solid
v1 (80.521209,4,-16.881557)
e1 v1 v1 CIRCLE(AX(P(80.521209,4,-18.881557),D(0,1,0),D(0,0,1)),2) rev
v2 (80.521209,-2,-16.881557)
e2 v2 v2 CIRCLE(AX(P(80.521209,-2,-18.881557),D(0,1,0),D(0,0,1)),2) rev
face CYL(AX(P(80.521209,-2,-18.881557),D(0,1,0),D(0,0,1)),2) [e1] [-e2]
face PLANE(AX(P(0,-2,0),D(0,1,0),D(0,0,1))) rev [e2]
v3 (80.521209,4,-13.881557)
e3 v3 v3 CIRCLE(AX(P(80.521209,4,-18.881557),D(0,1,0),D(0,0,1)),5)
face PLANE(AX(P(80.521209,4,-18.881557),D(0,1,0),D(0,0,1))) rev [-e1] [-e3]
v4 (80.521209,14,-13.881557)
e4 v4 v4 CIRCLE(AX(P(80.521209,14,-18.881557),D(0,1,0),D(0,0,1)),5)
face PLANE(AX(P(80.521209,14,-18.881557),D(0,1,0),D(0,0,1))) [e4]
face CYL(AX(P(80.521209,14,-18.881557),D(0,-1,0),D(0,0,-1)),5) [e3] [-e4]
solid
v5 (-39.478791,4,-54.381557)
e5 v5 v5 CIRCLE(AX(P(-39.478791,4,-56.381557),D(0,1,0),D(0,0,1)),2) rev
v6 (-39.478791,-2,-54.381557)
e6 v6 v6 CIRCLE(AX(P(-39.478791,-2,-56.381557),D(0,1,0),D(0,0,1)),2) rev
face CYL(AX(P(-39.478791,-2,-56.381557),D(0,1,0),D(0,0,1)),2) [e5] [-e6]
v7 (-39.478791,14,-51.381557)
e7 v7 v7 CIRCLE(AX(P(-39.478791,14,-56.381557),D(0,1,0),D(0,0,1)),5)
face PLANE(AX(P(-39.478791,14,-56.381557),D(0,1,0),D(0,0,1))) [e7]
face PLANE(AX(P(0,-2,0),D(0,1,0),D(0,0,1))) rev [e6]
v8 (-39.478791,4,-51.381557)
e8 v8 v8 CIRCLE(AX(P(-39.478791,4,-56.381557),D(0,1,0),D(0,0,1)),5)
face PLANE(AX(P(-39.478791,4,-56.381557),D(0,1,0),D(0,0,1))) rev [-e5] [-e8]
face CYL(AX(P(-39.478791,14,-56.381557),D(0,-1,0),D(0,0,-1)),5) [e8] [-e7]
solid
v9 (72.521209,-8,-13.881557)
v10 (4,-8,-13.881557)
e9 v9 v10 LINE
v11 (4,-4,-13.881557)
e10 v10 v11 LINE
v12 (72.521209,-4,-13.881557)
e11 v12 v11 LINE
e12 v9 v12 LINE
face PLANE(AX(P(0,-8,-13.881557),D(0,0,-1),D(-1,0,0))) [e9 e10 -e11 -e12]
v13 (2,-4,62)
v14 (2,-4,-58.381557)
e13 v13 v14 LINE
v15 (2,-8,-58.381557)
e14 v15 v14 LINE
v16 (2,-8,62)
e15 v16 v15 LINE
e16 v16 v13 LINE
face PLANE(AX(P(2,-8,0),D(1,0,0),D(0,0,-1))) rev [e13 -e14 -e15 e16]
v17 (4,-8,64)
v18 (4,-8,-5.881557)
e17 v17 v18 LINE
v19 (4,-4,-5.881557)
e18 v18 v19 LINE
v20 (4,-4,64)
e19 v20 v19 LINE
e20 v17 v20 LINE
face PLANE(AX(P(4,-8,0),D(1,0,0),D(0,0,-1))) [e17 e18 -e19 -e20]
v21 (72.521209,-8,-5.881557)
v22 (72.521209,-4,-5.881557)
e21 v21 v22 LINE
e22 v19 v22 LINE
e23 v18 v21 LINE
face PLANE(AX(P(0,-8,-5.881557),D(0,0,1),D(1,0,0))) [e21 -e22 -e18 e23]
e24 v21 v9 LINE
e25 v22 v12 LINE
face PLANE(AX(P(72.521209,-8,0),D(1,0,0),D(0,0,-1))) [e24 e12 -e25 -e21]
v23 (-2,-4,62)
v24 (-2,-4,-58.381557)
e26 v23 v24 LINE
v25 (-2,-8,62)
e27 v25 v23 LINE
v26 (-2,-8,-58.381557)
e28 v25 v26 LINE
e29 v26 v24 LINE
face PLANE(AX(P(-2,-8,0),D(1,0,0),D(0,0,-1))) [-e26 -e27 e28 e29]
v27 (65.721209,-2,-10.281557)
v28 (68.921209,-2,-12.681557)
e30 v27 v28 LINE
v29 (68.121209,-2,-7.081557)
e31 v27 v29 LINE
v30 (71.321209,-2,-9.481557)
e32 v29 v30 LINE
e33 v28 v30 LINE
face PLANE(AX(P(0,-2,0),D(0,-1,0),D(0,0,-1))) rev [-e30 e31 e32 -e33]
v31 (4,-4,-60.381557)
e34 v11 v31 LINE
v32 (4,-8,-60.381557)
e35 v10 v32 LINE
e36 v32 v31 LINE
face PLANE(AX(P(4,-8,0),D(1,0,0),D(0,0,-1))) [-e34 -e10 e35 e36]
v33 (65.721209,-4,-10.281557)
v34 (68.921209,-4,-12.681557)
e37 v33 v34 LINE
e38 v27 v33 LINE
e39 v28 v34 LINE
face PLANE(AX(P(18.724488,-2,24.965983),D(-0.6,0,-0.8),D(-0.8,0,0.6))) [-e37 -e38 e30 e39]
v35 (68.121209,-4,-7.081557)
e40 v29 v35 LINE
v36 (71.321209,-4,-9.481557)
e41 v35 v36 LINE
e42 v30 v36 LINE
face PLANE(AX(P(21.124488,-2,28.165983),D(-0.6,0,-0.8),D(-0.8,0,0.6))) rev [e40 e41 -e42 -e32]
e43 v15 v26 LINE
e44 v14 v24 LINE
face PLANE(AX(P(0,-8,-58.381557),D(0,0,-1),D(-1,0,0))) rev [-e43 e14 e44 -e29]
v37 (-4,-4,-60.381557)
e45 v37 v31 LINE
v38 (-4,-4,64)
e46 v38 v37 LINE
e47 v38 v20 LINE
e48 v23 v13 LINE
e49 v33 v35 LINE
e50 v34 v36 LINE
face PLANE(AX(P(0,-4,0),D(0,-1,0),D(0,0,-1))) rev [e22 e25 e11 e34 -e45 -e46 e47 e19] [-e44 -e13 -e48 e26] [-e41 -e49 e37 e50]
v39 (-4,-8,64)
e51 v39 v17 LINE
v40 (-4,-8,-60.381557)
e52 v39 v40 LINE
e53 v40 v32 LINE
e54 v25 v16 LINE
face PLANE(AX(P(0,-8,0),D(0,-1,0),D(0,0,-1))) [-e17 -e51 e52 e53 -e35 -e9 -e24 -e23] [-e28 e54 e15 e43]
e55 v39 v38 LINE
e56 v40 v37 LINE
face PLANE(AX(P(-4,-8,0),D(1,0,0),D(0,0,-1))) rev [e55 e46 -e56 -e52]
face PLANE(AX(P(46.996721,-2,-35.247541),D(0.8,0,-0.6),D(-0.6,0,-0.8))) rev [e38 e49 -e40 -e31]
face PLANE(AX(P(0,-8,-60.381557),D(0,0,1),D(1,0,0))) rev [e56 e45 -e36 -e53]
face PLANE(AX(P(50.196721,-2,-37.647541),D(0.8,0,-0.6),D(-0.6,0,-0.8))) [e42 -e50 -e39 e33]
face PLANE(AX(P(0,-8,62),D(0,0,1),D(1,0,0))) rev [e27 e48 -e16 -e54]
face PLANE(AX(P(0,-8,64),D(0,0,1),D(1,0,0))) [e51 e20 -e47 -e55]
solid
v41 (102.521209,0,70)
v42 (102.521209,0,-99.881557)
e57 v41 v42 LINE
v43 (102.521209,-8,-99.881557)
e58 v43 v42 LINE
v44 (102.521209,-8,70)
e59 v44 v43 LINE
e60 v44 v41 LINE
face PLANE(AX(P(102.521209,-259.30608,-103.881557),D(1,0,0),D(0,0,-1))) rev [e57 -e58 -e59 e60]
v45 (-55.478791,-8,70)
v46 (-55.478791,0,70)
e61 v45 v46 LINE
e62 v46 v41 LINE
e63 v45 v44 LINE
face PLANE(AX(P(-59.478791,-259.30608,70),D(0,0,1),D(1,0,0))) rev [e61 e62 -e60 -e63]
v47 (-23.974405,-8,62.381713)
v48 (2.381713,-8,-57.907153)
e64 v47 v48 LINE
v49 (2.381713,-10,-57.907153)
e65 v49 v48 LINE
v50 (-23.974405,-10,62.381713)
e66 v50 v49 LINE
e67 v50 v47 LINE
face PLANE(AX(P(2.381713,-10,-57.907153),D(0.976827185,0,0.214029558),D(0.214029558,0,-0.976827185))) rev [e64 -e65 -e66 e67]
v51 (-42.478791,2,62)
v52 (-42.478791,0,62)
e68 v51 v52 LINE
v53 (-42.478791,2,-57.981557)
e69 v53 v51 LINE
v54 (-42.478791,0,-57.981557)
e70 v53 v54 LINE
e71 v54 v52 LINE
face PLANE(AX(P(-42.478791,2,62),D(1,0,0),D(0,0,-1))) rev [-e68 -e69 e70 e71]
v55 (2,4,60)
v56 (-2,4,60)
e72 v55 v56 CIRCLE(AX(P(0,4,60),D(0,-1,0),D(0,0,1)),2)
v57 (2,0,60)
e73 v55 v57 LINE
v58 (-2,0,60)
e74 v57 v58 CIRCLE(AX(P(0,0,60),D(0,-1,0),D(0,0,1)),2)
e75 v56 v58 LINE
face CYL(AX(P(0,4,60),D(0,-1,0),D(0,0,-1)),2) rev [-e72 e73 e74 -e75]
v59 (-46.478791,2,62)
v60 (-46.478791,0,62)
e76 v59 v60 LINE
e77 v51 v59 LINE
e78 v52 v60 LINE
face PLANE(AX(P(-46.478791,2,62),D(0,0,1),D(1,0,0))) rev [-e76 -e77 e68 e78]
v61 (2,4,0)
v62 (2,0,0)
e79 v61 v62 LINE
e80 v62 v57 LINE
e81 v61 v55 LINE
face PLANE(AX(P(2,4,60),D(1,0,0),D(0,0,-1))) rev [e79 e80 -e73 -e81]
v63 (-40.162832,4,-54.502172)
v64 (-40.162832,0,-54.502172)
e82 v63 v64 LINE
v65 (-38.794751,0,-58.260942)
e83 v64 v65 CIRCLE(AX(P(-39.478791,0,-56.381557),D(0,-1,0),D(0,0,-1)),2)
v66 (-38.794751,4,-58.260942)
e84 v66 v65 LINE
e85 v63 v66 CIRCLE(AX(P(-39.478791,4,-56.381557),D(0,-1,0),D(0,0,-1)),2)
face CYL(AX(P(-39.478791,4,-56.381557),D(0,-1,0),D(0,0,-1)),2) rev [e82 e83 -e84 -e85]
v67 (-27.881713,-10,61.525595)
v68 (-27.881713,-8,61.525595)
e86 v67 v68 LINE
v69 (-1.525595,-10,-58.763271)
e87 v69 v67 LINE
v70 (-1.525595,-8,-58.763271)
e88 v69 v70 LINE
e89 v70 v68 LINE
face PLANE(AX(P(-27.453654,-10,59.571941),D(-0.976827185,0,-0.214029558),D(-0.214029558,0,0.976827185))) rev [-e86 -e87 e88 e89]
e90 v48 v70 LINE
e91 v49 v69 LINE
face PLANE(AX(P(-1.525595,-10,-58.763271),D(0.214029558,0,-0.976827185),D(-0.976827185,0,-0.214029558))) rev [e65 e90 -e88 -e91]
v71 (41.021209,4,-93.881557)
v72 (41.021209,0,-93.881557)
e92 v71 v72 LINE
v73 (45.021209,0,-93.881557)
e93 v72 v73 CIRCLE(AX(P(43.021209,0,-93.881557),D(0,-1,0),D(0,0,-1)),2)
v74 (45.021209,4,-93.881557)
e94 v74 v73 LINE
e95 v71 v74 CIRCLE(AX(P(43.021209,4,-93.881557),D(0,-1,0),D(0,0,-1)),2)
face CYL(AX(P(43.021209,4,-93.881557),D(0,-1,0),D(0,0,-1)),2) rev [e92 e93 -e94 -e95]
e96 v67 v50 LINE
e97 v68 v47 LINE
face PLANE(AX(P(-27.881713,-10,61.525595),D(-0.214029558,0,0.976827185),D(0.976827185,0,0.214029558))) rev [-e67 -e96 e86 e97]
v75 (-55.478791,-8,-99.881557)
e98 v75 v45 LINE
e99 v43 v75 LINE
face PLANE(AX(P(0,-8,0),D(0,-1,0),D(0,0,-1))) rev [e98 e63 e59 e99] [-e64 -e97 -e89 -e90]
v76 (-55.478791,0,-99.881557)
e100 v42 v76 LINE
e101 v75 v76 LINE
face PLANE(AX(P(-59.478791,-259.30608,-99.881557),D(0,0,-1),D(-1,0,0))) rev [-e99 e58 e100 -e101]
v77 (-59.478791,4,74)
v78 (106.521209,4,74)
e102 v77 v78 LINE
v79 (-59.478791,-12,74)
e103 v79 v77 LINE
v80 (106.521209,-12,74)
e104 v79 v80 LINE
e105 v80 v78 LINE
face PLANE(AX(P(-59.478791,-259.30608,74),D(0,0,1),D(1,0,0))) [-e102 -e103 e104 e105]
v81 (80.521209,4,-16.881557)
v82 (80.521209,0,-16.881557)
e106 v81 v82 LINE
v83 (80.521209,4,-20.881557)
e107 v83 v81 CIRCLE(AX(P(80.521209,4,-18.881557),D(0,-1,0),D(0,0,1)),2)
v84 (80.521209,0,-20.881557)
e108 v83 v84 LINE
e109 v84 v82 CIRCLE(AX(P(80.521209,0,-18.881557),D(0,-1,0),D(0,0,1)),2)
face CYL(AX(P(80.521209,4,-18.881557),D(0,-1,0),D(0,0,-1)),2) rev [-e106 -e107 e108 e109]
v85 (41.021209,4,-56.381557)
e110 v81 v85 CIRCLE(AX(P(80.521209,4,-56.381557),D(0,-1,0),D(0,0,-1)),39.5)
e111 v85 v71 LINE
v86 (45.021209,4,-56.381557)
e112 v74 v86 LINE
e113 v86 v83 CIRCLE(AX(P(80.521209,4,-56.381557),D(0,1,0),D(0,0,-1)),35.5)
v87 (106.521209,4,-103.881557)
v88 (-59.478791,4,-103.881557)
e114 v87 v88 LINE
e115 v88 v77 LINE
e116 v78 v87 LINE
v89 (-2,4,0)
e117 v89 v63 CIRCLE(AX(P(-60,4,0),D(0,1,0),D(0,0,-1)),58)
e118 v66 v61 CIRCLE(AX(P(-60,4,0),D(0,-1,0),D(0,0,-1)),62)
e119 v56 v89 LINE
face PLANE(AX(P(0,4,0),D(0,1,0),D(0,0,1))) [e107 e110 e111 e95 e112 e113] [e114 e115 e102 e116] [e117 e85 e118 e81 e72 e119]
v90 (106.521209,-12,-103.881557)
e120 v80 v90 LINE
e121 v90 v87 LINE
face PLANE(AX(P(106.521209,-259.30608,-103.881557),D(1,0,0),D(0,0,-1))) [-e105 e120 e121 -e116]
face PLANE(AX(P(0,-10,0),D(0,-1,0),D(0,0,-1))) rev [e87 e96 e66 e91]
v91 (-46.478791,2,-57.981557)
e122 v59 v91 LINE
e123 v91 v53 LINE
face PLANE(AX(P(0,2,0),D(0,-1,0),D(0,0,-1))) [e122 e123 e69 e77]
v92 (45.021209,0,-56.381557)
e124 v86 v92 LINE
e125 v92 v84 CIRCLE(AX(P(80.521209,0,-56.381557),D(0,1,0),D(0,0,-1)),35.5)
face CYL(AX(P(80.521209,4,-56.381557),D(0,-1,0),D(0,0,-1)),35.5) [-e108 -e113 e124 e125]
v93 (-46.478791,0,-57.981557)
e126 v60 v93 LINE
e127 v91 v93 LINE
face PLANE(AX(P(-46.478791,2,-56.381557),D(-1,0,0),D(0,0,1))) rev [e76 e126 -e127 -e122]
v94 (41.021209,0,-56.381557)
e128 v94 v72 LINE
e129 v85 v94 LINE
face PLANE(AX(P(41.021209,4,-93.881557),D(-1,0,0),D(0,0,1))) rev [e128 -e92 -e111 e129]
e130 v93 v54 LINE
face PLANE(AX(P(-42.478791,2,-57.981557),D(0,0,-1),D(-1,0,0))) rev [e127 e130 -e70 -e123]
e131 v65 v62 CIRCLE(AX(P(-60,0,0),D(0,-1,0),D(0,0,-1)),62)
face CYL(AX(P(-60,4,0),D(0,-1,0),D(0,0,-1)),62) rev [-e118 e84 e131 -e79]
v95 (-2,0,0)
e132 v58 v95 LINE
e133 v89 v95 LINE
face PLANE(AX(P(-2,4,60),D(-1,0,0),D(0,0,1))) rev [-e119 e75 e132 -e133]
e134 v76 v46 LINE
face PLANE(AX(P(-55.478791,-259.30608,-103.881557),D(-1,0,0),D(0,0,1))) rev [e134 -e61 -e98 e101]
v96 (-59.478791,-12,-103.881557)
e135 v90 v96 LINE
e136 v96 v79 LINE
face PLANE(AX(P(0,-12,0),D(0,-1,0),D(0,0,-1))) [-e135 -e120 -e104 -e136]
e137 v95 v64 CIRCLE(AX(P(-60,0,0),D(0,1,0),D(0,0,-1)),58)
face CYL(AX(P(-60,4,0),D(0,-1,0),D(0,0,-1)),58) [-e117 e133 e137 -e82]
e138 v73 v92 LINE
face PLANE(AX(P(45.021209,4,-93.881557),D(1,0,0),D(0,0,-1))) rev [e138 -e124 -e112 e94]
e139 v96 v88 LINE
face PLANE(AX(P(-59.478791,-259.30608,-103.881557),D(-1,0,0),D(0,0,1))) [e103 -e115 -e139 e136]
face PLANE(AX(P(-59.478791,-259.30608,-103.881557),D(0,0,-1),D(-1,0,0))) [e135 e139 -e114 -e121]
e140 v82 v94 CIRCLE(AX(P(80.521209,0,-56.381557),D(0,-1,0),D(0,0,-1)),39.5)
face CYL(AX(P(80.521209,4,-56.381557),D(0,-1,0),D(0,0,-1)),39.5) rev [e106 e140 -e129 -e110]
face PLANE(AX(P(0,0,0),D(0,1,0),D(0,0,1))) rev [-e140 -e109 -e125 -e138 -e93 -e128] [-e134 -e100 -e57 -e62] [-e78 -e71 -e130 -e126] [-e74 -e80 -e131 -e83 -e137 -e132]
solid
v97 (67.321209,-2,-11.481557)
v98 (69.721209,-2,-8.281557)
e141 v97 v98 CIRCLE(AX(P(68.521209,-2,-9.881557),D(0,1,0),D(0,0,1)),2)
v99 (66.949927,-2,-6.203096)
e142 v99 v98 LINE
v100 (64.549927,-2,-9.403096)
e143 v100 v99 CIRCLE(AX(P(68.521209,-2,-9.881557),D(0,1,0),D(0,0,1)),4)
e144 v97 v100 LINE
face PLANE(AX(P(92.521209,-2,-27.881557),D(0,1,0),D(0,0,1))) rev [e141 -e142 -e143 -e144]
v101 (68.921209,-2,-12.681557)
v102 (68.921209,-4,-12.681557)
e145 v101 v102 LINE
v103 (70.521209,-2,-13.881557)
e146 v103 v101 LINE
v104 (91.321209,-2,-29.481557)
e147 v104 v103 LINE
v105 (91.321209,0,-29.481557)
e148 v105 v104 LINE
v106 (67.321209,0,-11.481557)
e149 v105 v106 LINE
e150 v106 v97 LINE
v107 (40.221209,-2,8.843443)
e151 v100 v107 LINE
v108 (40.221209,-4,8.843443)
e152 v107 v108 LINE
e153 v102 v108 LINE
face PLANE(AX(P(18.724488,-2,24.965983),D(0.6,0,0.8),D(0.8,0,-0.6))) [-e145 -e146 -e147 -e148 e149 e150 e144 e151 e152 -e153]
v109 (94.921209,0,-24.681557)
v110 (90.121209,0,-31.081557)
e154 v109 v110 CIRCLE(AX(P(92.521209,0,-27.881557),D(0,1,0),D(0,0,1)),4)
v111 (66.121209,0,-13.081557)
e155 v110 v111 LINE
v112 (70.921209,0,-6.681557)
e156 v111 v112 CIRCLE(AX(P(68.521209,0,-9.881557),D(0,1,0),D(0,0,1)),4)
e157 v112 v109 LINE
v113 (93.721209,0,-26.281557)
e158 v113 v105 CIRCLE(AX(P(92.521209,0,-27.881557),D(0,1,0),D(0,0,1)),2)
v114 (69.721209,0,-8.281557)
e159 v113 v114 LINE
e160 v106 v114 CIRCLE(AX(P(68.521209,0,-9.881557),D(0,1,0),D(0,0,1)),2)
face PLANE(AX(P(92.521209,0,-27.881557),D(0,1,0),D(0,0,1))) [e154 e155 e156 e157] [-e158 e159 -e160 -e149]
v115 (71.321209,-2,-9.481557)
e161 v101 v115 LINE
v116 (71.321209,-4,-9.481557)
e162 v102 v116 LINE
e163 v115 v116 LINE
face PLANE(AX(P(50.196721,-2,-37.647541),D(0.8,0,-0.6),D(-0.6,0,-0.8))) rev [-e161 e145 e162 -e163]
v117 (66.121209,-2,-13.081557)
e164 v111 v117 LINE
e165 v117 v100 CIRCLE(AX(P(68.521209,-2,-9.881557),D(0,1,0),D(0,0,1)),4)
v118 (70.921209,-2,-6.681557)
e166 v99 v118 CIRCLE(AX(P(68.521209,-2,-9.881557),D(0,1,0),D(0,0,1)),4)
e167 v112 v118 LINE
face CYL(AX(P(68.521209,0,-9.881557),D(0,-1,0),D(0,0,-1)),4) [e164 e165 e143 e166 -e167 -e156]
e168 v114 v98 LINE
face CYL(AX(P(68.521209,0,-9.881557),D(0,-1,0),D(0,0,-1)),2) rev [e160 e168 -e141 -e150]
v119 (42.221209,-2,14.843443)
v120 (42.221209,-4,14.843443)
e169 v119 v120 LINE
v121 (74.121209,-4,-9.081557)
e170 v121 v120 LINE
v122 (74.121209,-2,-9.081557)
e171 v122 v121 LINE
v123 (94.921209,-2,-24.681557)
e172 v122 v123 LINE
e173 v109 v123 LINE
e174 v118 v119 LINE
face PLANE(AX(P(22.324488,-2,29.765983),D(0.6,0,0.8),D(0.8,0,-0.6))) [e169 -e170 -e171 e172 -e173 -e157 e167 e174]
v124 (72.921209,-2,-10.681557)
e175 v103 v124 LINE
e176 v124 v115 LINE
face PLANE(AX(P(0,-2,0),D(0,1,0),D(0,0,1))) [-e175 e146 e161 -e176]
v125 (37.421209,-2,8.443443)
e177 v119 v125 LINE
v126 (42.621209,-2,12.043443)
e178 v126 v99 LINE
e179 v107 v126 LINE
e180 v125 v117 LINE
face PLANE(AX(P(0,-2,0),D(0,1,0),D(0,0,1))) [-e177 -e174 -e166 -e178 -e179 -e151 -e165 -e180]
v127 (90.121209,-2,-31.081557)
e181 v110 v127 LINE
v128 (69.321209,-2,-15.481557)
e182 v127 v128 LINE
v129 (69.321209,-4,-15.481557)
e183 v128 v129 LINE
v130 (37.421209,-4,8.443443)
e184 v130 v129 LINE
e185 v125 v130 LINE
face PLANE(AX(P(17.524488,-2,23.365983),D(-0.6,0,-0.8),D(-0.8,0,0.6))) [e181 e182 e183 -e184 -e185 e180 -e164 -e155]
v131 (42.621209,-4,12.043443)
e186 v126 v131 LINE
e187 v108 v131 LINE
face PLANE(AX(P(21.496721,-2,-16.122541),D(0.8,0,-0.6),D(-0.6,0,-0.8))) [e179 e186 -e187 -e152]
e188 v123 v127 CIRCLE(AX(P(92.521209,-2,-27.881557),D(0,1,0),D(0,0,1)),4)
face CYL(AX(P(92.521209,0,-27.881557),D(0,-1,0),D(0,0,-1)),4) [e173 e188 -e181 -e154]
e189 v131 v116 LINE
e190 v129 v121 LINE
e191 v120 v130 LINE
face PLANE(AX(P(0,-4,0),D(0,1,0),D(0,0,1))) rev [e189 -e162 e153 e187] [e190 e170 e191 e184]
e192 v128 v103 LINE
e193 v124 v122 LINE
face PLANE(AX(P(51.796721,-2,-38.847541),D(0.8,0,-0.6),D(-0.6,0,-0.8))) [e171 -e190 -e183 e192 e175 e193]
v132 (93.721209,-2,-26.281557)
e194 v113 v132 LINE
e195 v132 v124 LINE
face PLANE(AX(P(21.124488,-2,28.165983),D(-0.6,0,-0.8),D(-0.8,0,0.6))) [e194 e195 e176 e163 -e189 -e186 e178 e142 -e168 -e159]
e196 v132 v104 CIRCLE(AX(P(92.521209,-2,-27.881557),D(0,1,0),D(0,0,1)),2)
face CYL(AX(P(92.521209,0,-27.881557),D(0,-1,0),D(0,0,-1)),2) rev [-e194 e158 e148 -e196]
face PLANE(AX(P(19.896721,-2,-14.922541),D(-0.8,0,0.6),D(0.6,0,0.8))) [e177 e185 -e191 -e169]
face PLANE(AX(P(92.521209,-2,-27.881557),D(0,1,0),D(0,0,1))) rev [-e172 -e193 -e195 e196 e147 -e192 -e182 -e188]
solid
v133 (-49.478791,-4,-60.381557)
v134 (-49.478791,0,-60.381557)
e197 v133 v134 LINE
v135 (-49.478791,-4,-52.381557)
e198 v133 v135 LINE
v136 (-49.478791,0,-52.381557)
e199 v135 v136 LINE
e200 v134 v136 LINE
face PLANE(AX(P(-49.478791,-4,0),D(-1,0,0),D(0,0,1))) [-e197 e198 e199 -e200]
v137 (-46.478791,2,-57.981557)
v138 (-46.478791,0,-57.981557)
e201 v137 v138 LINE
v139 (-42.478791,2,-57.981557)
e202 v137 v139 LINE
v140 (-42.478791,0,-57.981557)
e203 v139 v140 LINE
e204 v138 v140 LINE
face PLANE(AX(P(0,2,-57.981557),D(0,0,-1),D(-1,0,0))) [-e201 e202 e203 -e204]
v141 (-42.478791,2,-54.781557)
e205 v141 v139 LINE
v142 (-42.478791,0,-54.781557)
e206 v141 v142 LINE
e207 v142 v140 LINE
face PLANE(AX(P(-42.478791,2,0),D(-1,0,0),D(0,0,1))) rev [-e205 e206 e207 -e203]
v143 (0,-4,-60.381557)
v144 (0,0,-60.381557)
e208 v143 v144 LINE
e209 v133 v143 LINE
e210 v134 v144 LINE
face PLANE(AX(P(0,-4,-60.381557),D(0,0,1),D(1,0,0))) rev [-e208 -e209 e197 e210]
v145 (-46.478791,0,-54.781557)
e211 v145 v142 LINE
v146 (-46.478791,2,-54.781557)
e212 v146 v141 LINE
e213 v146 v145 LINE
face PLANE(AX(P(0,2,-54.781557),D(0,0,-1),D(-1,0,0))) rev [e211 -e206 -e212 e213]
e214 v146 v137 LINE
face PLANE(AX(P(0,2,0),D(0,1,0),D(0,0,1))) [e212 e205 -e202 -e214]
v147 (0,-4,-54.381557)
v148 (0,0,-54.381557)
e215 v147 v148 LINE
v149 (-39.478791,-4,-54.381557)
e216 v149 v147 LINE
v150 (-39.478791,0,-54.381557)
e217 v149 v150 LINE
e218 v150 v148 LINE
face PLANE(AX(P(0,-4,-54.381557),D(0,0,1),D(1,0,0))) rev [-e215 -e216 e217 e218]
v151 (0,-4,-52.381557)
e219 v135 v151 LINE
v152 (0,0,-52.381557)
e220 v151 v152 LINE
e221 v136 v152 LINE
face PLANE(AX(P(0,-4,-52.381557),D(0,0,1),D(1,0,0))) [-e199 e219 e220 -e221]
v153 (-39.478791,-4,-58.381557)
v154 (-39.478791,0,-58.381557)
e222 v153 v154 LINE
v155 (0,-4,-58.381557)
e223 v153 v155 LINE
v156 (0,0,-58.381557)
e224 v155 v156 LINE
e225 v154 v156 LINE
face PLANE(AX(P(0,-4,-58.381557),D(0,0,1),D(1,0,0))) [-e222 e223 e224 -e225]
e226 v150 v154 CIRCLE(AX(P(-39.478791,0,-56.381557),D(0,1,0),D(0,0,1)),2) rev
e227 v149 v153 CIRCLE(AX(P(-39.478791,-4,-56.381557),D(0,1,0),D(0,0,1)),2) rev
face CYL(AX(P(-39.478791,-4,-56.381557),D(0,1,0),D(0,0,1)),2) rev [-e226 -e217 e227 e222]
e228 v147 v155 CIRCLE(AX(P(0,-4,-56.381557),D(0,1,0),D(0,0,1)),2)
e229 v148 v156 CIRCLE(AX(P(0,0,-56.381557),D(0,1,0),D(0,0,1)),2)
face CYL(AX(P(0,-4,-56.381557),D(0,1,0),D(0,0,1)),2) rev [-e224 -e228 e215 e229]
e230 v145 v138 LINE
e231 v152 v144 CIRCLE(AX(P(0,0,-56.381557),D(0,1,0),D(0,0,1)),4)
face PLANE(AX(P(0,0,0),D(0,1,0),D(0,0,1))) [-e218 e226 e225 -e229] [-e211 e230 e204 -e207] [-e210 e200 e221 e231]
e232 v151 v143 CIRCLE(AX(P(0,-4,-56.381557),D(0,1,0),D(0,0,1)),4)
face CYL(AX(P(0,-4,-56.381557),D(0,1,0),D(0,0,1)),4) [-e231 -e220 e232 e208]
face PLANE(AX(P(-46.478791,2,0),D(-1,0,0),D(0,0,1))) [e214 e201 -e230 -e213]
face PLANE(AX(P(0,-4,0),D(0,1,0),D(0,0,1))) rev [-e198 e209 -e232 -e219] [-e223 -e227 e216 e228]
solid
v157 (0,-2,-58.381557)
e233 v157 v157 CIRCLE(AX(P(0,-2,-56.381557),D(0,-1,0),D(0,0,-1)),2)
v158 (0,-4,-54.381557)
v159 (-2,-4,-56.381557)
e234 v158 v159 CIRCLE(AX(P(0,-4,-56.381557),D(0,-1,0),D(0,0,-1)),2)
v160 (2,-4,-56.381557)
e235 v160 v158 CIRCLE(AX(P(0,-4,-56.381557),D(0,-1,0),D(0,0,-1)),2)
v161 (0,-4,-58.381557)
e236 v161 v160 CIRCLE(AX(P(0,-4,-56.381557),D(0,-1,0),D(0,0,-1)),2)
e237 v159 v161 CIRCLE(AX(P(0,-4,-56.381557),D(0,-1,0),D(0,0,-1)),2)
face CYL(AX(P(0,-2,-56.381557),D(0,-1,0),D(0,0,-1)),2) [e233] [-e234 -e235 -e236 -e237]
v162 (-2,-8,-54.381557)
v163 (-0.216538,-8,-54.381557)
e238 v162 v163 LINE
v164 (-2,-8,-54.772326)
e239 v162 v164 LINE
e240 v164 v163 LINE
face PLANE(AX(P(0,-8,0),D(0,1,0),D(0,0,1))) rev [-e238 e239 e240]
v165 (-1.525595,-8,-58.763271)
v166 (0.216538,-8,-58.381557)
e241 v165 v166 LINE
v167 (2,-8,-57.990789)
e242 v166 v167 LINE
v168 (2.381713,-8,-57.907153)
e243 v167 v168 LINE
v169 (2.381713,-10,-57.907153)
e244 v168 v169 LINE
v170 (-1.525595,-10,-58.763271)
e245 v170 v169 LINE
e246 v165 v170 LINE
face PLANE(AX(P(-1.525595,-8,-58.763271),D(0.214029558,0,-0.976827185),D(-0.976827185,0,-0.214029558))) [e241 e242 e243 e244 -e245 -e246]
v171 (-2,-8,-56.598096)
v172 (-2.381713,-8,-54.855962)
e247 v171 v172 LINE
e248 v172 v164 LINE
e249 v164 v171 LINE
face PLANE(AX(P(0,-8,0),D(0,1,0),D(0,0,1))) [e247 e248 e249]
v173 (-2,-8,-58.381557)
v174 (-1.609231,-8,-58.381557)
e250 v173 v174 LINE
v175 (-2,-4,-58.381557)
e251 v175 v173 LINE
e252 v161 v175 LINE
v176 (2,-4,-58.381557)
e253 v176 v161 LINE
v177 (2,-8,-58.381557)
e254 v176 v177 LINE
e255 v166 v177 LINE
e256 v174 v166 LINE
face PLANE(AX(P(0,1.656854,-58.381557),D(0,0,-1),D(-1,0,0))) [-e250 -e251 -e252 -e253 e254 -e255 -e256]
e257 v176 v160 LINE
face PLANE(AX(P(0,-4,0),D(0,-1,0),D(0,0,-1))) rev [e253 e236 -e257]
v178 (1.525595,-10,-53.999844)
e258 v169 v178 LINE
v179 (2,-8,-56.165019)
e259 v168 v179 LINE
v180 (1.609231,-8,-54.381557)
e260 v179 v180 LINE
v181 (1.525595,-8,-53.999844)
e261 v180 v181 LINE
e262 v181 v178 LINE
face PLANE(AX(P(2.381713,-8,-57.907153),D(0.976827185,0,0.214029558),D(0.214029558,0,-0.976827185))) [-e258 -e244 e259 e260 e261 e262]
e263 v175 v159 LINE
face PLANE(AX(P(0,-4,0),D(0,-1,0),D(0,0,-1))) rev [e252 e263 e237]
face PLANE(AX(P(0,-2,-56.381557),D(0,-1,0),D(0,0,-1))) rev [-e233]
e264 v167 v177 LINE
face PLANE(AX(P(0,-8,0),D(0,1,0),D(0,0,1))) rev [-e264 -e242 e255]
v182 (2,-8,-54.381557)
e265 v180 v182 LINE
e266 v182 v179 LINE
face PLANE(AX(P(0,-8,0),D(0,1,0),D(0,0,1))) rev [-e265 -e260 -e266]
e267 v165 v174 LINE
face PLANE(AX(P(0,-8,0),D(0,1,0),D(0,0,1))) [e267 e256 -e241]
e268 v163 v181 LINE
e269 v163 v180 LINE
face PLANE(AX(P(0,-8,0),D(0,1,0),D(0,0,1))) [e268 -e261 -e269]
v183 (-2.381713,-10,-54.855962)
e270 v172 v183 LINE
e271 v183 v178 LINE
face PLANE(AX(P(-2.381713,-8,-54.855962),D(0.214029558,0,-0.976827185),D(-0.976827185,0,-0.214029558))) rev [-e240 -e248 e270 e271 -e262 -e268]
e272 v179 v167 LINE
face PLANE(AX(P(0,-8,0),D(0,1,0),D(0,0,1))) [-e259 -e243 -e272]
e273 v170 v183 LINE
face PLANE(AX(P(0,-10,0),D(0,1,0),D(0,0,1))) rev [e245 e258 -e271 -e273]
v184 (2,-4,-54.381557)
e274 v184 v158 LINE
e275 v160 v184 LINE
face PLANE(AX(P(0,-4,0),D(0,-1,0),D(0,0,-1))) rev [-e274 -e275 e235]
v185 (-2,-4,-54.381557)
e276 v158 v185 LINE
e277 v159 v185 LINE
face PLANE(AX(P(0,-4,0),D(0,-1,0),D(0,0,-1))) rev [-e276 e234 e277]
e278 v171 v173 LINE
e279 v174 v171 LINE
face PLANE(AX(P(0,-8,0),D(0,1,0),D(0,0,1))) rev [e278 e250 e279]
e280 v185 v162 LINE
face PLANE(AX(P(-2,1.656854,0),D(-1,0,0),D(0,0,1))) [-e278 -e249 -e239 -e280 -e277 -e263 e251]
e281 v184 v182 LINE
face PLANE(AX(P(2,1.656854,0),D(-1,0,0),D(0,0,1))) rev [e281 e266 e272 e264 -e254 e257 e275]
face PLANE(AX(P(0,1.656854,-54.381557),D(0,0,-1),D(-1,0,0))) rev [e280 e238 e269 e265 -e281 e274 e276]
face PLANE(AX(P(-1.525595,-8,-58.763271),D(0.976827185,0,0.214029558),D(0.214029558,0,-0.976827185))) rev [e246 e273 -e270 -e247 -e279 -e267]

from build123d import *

# Parameters (mm, degrees)
SKETCH3_W                = 4
SKETCH3_H                = 3.2
BOSS_EXTRUDE1_DEPTH      = 4
SKETCH3_3_W              = 4
SKETCH3_3_H              = 3.2
BOSS_EXTRUDE2_DEPTH      = 2
SKETCH4_W                = 2
SKETCH4_H                = 2
BOSS_EXTRUDE3_DEPTH      = 4
BOSS_EXTRUDE4_DEPTH      = 2
BOSS_EXTRUDE5_DEPTH      = 2
BOSS_EXTRUDE6_START      = 2
BOSS_EXTRUDE6_DEPTH      = 2
BOSS_EXTRUDE7_DEPTH      = 4
BOSS_EXTRUDE7_DEPTH_BACK = 12
SKETCH6_W                = 166
SKETCH6_H                = 177.881557247
SHELL1_START             = -8
SHELL1_OUTLINE_W         = 158
SHELL1_OUTLINE_H         = 169.881557247
SHELL1_DEPTH             = 8
CUT_EXTRUDE1_DEPTH       = 2
BOSS_EXTRUDE8_DEPTH      = 2
BOSS_EXTRUDE9_START      = 2
SKETCH8_4_W              = 4
SKETCH8_4_H              = 4
BOSS_EXTRUDE9_DEPTH      = 4
BOSS_EXTRUDE11_START     = 8
SKETCH8_5_R              = 2
BOSS_EXTRUDE11_DEPTH     = 2
CUT_EXTRUDE2_DEPTH       = 2
CUT_EXTRUDE3_DEPTH       = 150.272053036
BOSS_EXTRUDE12_DEPTH     = 6
SKETCH12_3_R             = 5
BOSS_EXTRUDE13_DEPTH     = 10
BOSS_EXTRUDE14_DEPTH     = 6
SKETCH13_3_R             = 5
BOSS_EXTRUDE15_DEPTH     = 10


# Read off the part's stored shape, not the designer's step: Shell1
with BuildPart() as part:
    # Sketch3 → Boss-Extrude1 (new body)
    # profile 1 of 2: a face of its own
    with BuildSketch(Plane(origin=(0, 0, 0), x_dir=(1, 0, 0), z_dir=(0, 1, 0))):
        with BuildLine():
            Line((-39.4787914, 52.381557247), (0, 52.381557247))
            ThreePointArc((0, 52.381557247), (4, 56.381557247), (0, 60.381557247))
            Line((0, 60.381557247), (-39.4787914, 60.381557247))
            Line((-39.4787914, 60.381557247), (-49.4787914, 60.381557247))
            Line((-49.4787914, 60.381557247), (-49.4787914, 52.381557247))
            Line((-49.4787914, 52.381557247), (-39.4787914, 52.381557247))
        make_face()
        with Locations((-44.4787914, 56.381557247)):
            Rectangle(SKETCH3_W, SKETCH3_H, mode=Mode.SUBTRACT)
        with BuildLine():
            ThreePointArc((0, 54.381557247), (2, 56.381557247), (0, 58.381557247))
            Line((0, 58.381557247), (-39.4787914, 58.381557247))
            ThreePointArc((-39.4787914, 58.381557247), (-41.4787914, 56.381557247), (-39.4787914, 54.381557247))
            Line((-39.4787914, 54.381557247), (0, 54.381557247))
        make_face(mode=Mode.SUBTRACT)
    # profile 2 of 2: a face of its own
    with BuildSketch(Plane(origin=(0, 0, 0), x_dir=(1, 0, 0), z_dir=(0, 1, 0))):
        with Locations((-44.4787914, 56.381557247)):
            Rectangle(SKETCH3_W, SKETCH3_H)
    extrude(amount=-BOSS_EXTRUDE1_DEPTH)

    # Sketch3<3> → Boss-Extrude2 (add)
    with BuildSketch(Plane(origin=(0, 0, 0), x_dir=(1, 0, 0), z_dir=(0, 1, 0))):
        with Locations((-44.4787914, 56.381557247)):
            Rectangle(SKETCH3_3_W, SKETCH3_3_H)
    extrude(amount=BOSS_EXTRUDE2_DEPTH)


with BuildPart() as body_2:
    # Sketch4 → Boss-Extrude3 (new body)
    # profile 1 of 7: a face of its own
    with BuildSketch(Plane.XZ.offset(4)):
        with Locations((-3, -53.381557247)):
            Rectangle(SKETCH4_W, SKETCH4_H)
    # profile 2 of 7: a face of its own
    with BuildSketch(Plane.XZ.offset(4)):
        Polygon((-2, -56.381557247), (-2, -54.381557247), (-4, -54.381557247), (-4, -56.381557247), (-4, -58.381557247), (-2, -58.381557247), align=None)
    # profile 3 of 7: a face of its own
    with BuildSketch(Plane.XZ.offset(4)):
        with BuildLine():
            ThreePointArc((4, -56.381557247), (3.464101615, -54.381557247), (2, -52.917455632))
            Line((2, -52.917455632), (2, -56.381557247))
            Line((2, -56.381557247), (2, -58.381557247))
            Line((2, -58.381557247), (0, -58.381557247))
            Line((0, -58.381557247), (-2, -58.381557247))
            Line((-2, -58.381557247), (-4, -58.381557247))
            Line((-4, -58.381557247), (-4, -60.381557247))
            Line((-4, -60.381557247), (0, -60.381557247))
            ThreePointArc((0, -60.381557247), (2.828427125, -59.209984372), (4, -56.381557247))
        make_face()
    # profile 4 of 7: a face of its own
    with BuildSketch(Plane.XZ.offset(4)):
        with BuildLine():
            Line((4, -60.381557247), (4, -56.381557247))
            ThreePointArc((4, -56.381557247), (2.828427125, -59.209984372), (0, -60.381557247))
            Line((0, -60.381557247), (4, -60.381557247))
        make_face()
    # profile 5 of 7: a face of its own
    with BuildSketch(Plane.XZ.offset(4)):
        with BuildLine():
            Line((-2, -52.381557247), (-2, 60))
            Line((-2, 60), (-2, 62))
            Line((-2, 62), (2, 62))
            Line((2, 62), (2, 60))
            Line((2, 60), (2, -52.917455632))
            ThreePointArc((2, -52.917455632), (3.464101615, -54.381557247), (4, -56.381557247))
            Line((4, -56.381557247), (4, -13.881557247))
            Line((4, -13.881557247), (4, -5.881557247))
            Line((4, -5.881557247), (4, 60))
            Line((4, 60), (4, 64))
            Line((4, 64), (-4, 64))
            Line((-4, 64), (-4, 60))
            Line((-4, 60), (-4, -52.381557247))
            Line((-4, -52.381557247), (-2, -52.381557247))
        make_face()
    # profile 6 of 7: a face of its own
    with BuildSketch(Plane.XZ.offset(4)):
        Polygon((4, -5.881557247), (4, -13.881557247), (68.5212086, -13.881557247), (72.5212086, -13.881557247), (72.5212086, -5.881557247), (68.5212086, -5.881557247), align=None)
        Polygon((68.9212086, -12.681557247), (65.7212086, -10.281557247), (68.1212086, -7.081557247), (71.3212086, -9.481557247), align=None, mode=Mode.SUBTRACT)
    # profile 7 of 7: a face of its own
    with BuildSketch(Plane.XZ.offset(4)):
        Polygon((68.1212086, -7.081557247), (71.3212086, -9.481557247), (68.9212086, -12.681557247), (65.7212086, -10.281557247), align=None)
    extrude(amount=BOSS_EXTRUDE3_DEPTH)

    # Sketch4<3> → Boss-Extrude4 (add)
    with BuildSketch(Plane.XZ.offset(4)):
        Polygon((68.1212086, -7.081557247), (71.3212086, -9.481557247), (68.9212086, -12.681557247), (65.7212086, -10.281557247), align=None)
    extrude(amount=-BOSS_EXTRUDE4_DEPTH)


with BuildPart() as body_3:
    # Sketch5 → Boss-Extrude5 (new body)
    with BuildSketch(Plane(origin=(0, -4, 0), x_dir=(1, 0, 0), z_dir=(0, 1, 0))):
        Polygon((42.2212086, -14.843442753), (74.1212086, 9.081557247), (69.3212086, 15.481557247), (37.4212086, -8.443442753), align=None)
        Polygon((68.9212086, 12.681557247), (71.3212086, 9.481557247), (42.6212086, -12.043442753), (40.2212086, -8.843442753), align=None, mode=Mode.SUBTRACT)
    extrude(amount=BOSS_EXTRUDE5_DEPTH)

    # Sketch5<5> → Boss-Extrude6 (add)
    with BuildSketch(Plane(origin=(0, -4, 0), x_dir=(1, 0, 0), z_dir=(0, 1, 0)).offset(BOSS_EXTRUDE6_START)):
        with BuildLine():
            ThreePointArc((64.549927307, 9.403096278), (65.3212086, 7.481557247), (66.949927307, 6.203096278))
            Line((66.949927307, 6.203096278), (68.1212086, 7.081557247))
            Line((68.1212086, 7.081557247), (66.921208622, 8.681557218))
            Line((66.921208622, 8.681557218), (65.7212086, 10.281557247))
            Line((65.7212086, 10.281557247), (64.549927307, 9.403096278))
        make_face()
        with BuildLine():
            Line((66.921208622, 8.681557218), (68.1212086, 7.081557247))
            Line((68.1212086, 7.081557247), (69.7212086, 8.281557247))
            ThreePointArc((69.7212086, 8.281557247), (68.238365905, 7.901658257), (66.921208622, 8.681557218))
        make_face()
        with BuildLine():
            Line((65.7212086, 10.281557247), (66.921208622, 8.681557218))
            ThreePointArc((66.921208622, 8.681557218), (66.54130961, 10.164399941), (67.3212086, 11.481557247))
            Line((67.3212086, 11.481557247), (65.7212086, 10.281557247))
        make_face()
        with BuildLine():
            ThreePointArc((66.1212086, 13.081557247), (64.84274763, 11.452838539), (64.549927307, 9.403096278))
            Line((64.549927307, 9.403096278), (65.7212086, 10.281557247))
            Line((65.7212086, 10.281557247), (67.3212086, 11.481557247))
            Line((67.3212086, 11.481557247), (68.9212086, 12.681557247))
            Line((68.9212086, 12.681557247), (70.5212086, 13.881557247))
            Line((70.5212086, 13.881557247), (67.187875266, 13.881557247))
            Line((67.187875266, 13.881557247), (66.1212086, 13.081557247))
        make_face()
        with BuildLine():
            ThreePointArc((66.949927307, 6.203096278), (68.999669569, 5.910275955), (70.9212086, 6.681557247))
            Line((70.9212086, 6.681557247), (72.5212086, 7.881557247))
            Line((72.5212086, 7.881557247), (72.5212086, 10.381557247))
            Line((72.5212086, 10.381557247), (71.3212086, 9.481557247))
            Line((71.3212086, 9.481557247), (69.7212086, 8.281557247))
            Line((69.7212086, 8.281557247), (68.1212086, 7.081557247))
            Line((68.1212086, 7.081557247), (66.949927307, 6.203096278))
        make_face()
        Polygon((72.5212086, 10.381557247), (72.5212086, 7.881557247), (74.1212086, 9.081557247), (72.9212086, 10.681557247), align=None)
        Polygon((67.187875266, 13.881557247), (70.5212086, 13.881557247), (69.3212086, 15.481557247), align=None)
        with BuildLine():
            Line((72.9212086, 10.681557247), (74.1212086, 9.081557247))
            Line((74.1212086, 9.081557247), (94.9212086, 24.681557247))
            ThreePointArc((94.9212086, 24.681557247), (95.7212086, 30.281557247), (90.1212086, 31.081557247))
            Line((90.1212086, 31.081557247), (69.3212086, 15.481557247))
            Line((69.3212086, 15.481557247), (70.5212086, 13.881557247))
            Line((70.5212086, 13.881557247), (91.3212086, 29.481557247))
            ThreePointArc((91.3212086, 29.481557247), (94.1212086, 29.081557247), (93.7212086, 26.281557247))
            Line((93.7212086, 26.281557247), (72.9212086, 10.681557247))
        make_face()
    extrude(amount=BOSS_EXTRUDE6_DEPTH)


with BuildPart() as body_4:
    # Sketch6 → Boss-Extrude7 (new, two sides: drawn at the far end of the back side and taken through both)
    with BuildSketch(Plane(origin=(0, 0, 0), x_dir=(1, 0, 0), z_dir=(0, 1, 0)).offset(-BOSS_EXTRUDE7_DEPTH_BACK)):
        with Locations((23.5212086, 14.940778624)):
            Rectangle(SKETCH6_W, SKETCH6_H)
    extrude(amount=BOSS_EXTRUDE7_DEPTH + BOSS_EXTRUDE7_DEPTH_BACK)

    # Shell1 outline → Shell1 (cut)
    with BuildSketch(Plane(origin=(0, 0, 0), x_dir=(1, 0, 0), z_dir=(0, 1, 0)).offset(SHELL1_START)):
        with Locations((23.5212086, 14.940778624)):
            Rectangle(SHELL1_OUTLINE_W, SHELL1_OUTLINE_H)
    extrude(amount=SHELL1_DEPTH, mode=Mode.SUBTRACT)

    # Sketch7 → Cut-Extrude1 (cut)
    with BuildSketch(Plane(origin=(0, -8, 0), x_dir=(1, 0, 0), z_dir=(0, 1, 0))):
        Polygon((-1.953654369, 56.809616362), (-27.453654369, -59.571940885), (-27.881713484, -61.525595254), (-23.974404746, -62.381713484), (-23.546345631, -60.428059115), (1.953654369, 55.953498132), (2.381713484, 57.907152501), (-1.525595254, 58.763270731), align=None)
    extrude(amount=-CUT_EXTRUDE1_DEPTH, mode=Mode.SUBTRACT)

    # Sketch10 → Cut-Extrude2 (cut)
    with BuildSketch(Plane.XZ):
        Polygon((-46.4787914, 60), (-46.4787914, -56.381557247), (-46.4787914, -57.981557247), (-42.4787914, -57.981557247), (-42.4787914, -56.381557247), (-42.4787914, 60), (-42.4787914, 62), (-46.4787914, 62), align=None)
    extrude(amount=-CUT_EXTRUDE2_DEPTH, mode=Mode.SUBTRACT)

    # Sketch11 → Cut-Extrude3 (cut, through all)
    with BuildSketch(Plane.XZ):
        with BuildLine():
            Line((-2, 60), (-2, 0))
            ThreePointArc((-2, 0), (-12.489181431, -33.267433308), (-40.162831687, -54.502172006))
            ThreePointArc((-40.162831687, -54.502172006), (-41.358176642, -57.065597534), (-38.794751114, -58.260942489))
            ThreePointArc((-38.794751114, -58.260942489), (-9.212573254, -35.561739054), (2, 0))
            Line((2, 0), (2, 60))
            ThreePointArc((2, 60), (0, 62), (-2, 60))
        make_face()
        with BuildLine():
            Line((41.0212086, -93.881557247), (41.0212086, -56.381557247))
            ThreePointArc((41.0212086, -56.381557247), (52.590490743, -28.45083939), (80.5212086, -16.881557247))
            ThreePointArc((80.5212086, -16.881557247), (82.5212086, -18.881557247), (80.5212086, -20.881557247))
            ThreePointArc((80.5212086, -20.881557247), (55.418917867, -31.279266515), (45.0212086, -56.381557247))
            Line((45.0212086, -56.381557247), (45.0212086, -93.881557247))
            ThreePointArc((45.0212086, -93.881557247), (43.0212086, -95.881557247), (41.0212086, -93.881557247))
        make_face()
    extrude(amount=-CUT_EXTRUDE3_DEPTH, mode=Mode.SUBTRACT)


with BuildPart() as body_5:
    # Sketch8 → Boss-Extrude8 (new body)
    with BuildSketch(Plane(origin=(0, -10, 0), x_dir=(1, 0, 0), z_dir=(0, 1, 0))):
        Polygon((-1.525595254, 58.763270731), (2.381713484, 57.907152501), (1.525595254, 53.999843763), (-2.381713484, 54.855961993), align=None)
    extrude(amount=BOSS_EXTRUDE8_DEPTH)

    # Sketch8<4> → Boss-Extrude9 (add)
    with BuildSketch(Plane(origin=(0, -10, 0), x_dir=(1, 0, 0), z_dir=(0, 1, 0)).offset(BOSS_EXTRUDE9_START)):
        with Locations((0, 56.381557247)):
            Rectangle(SKETCH8_4_W, SKETCH8_4_H)
    extrude(amount=BOSS_EXTRUDE9_DEPTH)

    # Sketch8<5> → Boss-Extrude11 (add)
    with BuildSketch(Plane(origin=(0, -10, 0), x_dir=(1, 0, 0), z_dir=(0, 1, 0)).offset(BOSS_EXTRUDE11_START)):
        with Locations(Location((0, 56.381557247, 0), (0, 0, 90))):
            Circle(SKETCH8_5_R)
    extrude(amount=-BOSS_EXTRUDE11_DEPTH)


with BuildPart() as body_6:
    # Sketch12 → Boss-Extrude12 (new body)
    with BuildSketch(Plane(origin=(0, 4, 0), x_dir=(1, 0, 0), z_dir=(0, 1, 0))):
        with BuildLine():
            ThreePointArc((-40.162831687, 54.502172006), (-38.331638528, 54.743253159), (-37.4787914, 56.381557247))
            ThreePointArc((-37.4787914, 56.381557247), (-37.840487312, 57.52871012), (-38.794751114, 58.260942489))
            ThreePointArc((-38.794751114, 58.260942489), (-41.358176642, 57.065597534), (-40.162831687, 54.502172006))
        make_face()
    extrude(amount=-BOSS_EXTRUDE12_DEPTH)

    # Sketch12<3> → Boss-Extrude13 (add)
    with BuildSketch(Plane(origin=(0, 4, 0), x_dir=(1, 0, 0), z_dir=(0, 1, 0))):
        with Locations(Location((-39.4787914, 56.381557247, 0), (0, 0, 270))):
            Circle(SKETCH12_3_R)
    extrude(amount=BOSS_EXTRUDE13_DEPTH)


with BuildPart() as body_7:
    # Sketch13 → Boss-Extrude14 (new body)
    with BuildSketch(Plane(origin=(0, 4, 0), x_dir=(1, 0, 0), z_dir=(0, 1, 0))):
        with BuildLine():
            ThreePointArc((80.5212086, 16.881557247), (81.935422162, 17.467343685), (82.5212086, 18.881557247))
            ThreePointArc((82.5212086, 18.881557247), (81.935422162, 20.29577081), (80.5212086, 20.881557247))
            ThreePointArc((80.5212086, 20.881557247), (78.5212086, 18.881557247), (80.5212086, 16.881557247))
        make_face()
    extrude(amount=-BOSS_EXTRUDE14_DEPTH)

    # Sketch13<3> → Boss-Extrude15 (add)
    with BuildSketch(Plane(origin=(0, 4, 0), x_dir=(1, 0, 0), z_dir=(0, 1, 0))):
        with Locations(Location((80.5212086, 18.881557247, 0), (0, 0, 270))):
            Circle(SKETCH13_3_R)
    extrude(amount=BOSS_EXTRUDE15_DEPTH)


solid = Compound([part.part, body_2.part, body_3.part, body_4.part, body_5.part, body_6.part, body_7.part])
